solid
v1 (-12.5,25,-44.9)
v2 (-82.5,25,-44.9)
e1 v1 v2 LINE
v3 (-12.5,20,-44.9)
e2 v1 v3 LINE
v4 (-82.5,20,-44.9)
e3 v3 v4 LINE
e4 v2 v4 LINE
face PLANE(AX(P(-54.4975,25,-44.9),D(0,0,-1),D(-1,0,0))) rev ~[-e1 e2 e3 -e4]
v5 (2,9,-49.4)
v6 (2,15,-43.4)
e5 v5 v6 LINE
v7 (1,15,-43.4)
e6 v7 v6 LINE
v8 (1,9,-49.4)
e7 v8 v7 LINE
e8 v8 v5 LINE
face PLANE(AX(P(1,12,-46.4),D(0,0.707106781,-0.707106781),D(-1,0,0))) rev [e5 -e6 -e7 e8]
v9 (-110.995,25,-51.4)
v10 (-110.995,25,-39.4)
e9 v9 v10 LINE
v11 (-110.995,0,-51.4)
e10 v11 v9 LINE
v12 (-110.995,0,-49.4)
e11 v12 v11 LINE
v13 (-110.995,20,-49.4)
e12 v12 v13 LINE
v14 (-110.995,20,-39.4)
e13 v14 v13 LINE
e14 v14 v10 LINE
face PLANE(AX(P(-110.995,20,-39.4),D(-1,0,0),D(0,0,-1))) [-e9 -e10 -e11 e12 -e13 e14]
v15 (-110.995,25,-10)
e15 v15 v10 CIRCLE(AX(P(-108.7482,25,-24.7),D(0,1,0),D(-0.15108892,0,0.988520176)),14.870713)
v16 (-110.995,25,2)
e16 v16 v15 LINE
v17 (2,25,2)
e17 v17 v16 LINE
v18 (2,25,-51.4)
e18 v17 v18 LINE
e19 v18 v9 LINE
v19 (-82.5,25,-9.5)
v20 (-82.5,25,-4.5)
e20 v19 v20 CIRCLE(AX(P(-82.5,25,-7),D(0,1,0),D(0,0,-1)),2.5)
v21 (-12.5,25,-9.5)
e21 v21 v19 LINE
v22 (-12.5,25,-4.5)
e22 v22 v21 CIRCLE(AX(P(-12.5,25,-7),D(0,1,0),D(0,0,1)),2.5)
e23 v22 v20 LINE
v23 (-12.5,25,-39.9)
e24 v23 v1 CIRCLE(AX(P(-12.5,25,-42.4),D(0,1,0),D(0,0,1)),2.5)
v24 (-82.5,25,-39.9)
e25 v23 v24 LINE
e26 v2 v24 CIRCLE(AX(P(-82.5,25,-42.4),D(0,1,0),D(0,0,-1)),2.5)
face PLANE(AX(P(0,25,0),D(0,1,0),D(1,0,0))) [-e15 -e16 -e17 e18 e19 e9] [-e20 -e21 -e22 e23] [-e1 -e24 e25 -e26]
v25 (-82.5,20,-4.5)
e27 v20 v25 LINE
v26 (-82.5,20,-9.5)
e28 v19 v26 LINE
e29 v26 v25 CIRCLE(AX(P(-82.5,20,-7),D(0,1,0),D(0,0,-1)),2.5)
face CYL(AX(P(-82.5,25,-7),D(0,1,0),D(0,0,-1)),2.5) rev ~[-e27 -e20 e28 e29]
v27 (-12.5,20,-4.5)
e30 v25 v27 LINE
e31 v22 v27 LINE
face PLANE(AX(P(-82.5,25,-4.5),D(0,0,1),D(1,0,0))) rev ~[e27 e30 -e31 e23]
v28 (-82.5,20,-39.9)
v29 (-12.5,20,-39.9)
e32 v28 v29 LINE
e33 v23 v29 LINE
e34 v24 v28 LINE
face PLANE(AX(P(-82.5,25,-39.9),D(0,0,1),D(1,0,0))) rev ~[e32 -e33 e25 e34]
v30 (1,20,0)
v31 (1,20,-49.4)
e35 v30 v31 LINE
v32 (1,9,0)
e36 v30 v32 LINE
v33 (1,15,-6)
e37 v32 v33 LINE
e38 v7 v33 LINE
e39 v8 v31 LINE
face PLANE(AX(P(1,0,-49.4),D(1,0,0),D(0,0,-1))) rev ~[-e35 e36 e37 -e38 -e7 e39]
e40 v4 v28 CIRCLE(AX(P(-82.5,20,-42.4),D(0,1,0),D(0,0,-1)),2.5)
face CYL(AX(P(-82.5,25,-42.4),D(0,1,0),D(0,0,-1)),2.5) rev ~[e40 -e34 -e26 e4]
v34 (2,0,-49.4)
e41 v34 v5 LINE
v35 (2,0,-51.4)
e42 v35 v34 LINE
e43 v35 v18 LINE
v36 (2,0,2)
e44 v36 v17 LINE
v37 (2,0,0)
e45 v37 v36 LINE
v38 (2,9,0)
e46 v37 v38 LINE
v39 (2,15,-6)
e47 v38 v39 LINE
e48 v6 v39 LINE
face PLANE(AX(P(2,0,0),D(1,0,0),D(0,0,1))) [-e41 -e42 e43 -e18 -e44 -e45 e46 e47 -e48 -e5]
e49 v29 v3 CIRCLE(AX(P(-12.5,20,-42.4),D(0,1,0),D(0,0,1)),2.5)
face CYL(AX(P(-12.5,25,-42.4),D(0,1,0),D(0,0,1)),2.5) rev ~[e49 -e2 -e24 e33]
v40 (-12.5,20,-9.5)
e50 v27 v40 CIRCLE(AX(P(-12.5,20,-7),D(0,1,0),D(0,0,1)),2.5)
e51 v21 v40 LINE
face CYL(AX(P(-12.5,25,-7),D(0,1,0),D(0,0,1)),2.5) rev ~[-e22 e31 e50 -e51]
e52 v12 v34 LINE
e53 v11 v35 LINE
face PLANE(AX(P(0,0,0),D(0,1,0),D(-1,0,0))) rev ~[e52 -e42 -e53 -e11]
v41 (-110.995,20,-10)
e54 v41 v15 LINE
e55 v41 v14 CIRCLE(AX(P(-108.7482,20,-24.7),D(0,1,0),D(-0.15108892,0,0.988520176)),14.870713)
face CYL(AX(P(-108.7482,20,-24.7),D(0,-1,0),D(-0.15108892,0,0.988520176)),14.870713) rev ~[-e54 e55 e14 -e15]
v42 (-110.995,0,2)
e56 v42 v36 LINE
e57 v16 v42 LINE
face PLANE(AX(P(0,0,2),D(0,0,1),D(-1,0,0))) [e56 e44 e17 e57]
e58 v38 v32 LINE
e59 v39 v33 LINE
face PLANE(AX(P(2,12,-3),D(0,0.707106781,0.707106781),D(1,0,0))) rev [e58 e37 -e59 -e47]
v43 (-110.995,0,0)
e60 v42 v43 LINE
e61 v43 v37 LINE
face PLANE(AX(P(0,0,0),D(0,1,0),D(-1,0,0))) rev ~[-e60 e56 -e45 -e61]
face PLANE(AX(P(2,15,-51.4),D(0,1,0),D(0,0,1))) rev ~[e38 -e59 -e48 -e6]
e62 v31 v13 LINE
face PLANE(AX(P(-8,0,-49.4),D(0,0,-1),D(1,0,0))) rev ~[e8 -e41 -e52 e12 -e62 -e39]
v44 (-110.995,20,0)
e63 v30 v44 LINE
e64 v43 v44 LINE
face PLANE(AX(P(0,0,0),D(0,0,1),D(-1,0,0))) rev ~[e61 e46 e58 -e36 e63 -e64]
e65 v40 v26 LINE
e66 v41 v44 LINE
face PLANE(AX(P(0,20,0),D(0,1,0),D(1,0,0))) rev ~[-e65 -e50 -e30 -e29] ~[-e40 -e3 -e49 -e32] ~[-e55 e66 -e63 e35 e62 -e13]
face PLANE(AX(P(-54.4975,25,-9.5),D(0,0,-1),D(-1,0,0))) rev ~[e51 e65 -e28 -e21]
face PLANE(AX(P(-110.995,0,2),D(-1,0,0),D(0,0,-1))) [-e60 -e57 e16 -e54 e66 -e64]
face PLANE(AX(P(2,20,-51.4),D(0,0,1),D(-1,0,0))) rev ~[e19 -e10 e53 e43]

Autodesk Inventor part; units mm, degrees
ref_plane "YZ Plane" through (0, 0, 0) normal (1, 0, 0) x (0, 1, 0)
ref_plane "XZ Plane" through (0, 0, 0) normal (0, 1, 0) x (-1, 0, 0)
ref_plane "XY Plane" through (0, 0, 0) normal (0, 0, 1) x (1, 0, 0)
sketch "Szkic1" plane through (0, 0, 0) normal (0, 1, 0) x (-1, 0, 0)
  line L0 (0, 0) -> (0, -49.4)
  line L1 (0, 0) -> (108, 0)
  line L2 (0, 0) -> (108.995, 0)
  line L3 (108.995, 0) -> (108.995, -49.4)
  line L4 (108.995, -49.4) -> (0, -49.4)
  line L5 (0, -49.4) -> (0, 0)
  line L6 (0, 0) -> (0, 2)
  line L7 (0, 2) -> (-2, 2)
  line L8 (108.995, -49.4) -> (110.995, -49.4)
  line L9 (110.995, -49.4) -> (110.995, -51.4)
  line L10 (110.995, -51.4) -> (-2, -51.4)
  line L11 (-2, -51.4) -> (-2, 2)
  line L12 (-2, 2) -> (110.995, 2)
  line L13 (110.995, 2) -> (110.995, -51.4)
  line L14 (110.995, 2) -> (100.995, 2)
  line L15 (100.995, 2) -> (100.995, 0)
  line L16 (110.995, -51.4) -> (100.995, -51.4)
  line L17 (100.995, -51.4) -> (100.995, -49.4)
  line L18 (-2, 2) -> (8, 2)
  line L19 (8, 2) -> (8, 0)
  line L20 (-2, -51.4) -> (8, -51.4)
  line L21 (8, -51.4) -> (8, -49.4)
  line L22 (-2, 0) -> (0, 0)
  line L23 (108.995, 0) -> (110.995, 0)
  line L24 (108.995, -49.4) -> (110.995, -49.4)
  line L25 (-2, -49.4) -> (0, -49.4)
  line L26 (100.995, 2) -> (90.995, 2)
  line L27 (90.995, 2) -> (90.995, 0)
  line L28 (100.995, -51.4) -> (90.995, -51.4)
  line L29 (90.995, -51.4) -> (90.995, -49.4)
  line L30 (110.995, -24.7) -> (-2, -24.7)
  line L31 (54.4975, -51.4) -> (54.4975, 2)
  line L32 (90.995, 2) -> (60.995, 2)
  line L33 (60.995, 2) -> (60.995, 0)
  line L34 (48, 2) -> (48, 0)
  line L35 (60.995, -51.4) -> (60.995, -49.4)
  line L36 (48, -51.4) -> (48, -49.4)
  point P0 (48, 0)
  dimension "d0" = 49.4
  dimension "d1" = 108
  dimension "d2" = 2
  dimension "d3" = 2
  dimension "d4" = 2
  dimension "d5" = 2
  dimension "d6" = 10
  dimension "d7" = 10
  dimension "d8" = 10
  dimension "d9" = 10
  dimension "d16" = 10
  dimension "d17" = 10
  dimension "d33" = 30
extrude "Wyciągnięcie proste1" add sketch "Szkic1" along normal blind 20 contours L6 L12 L19 L1 | L22 L11 L7 L6 | L19 L12 L34 L1 | L4 L21 L10 L11 L25 | L34 L12 L31 L1 | L4 L36 L10 L21 | L31 L10 L36 L4 | L4 L35 L10 L31 | L31 L12 L33 L1 | L2 L1 L15 L12 L13 L23 | L8 L9 L10 L17 L4 | L4 L29 L10 L35 | L33 L12 L27 L1 | L17 L10 L29 L4 | L27 L12 L15 L1
sketch "Szkic2" plane through (0, 20, 0) normal (0, 1, 0) x (1, 0, 0)
  line L0 (-8, -2) -> (2, -2) projected
  line L1 (2, 51.4) -> (-110.995, 51.4) projected
  line L2 (2, -2) -> (-110.995, -2)
  line L3 (-110.995, -2) -> (-110.995, 51.4)
  line L4 (-110.995, 51.4) -> (2, 51.4)
  line L5 (2, 51.4) -> (2, -2)
  line L6 (-110.995, 0) -> (-110.995, 10)
  line L7 (-110.995, 49.4) -> (2, 49.4) projected
  line L8 (-110.995, 49.4) -> (-110.995, 39.4)
  arc A0 (-110.995, 10) -> (-110.995, 39.4) centre (-125.3914, 24.7) ccw
  arc A1 (-110.995, 10) -> (-110.995, 39.4) centre (-108.7482, 24.7) ccw
  point P0 (0, 0)
  point P1 (-100.995, 51.4)
  point P2 (-100.995, 49.4)
  point P3 (-100.995, 51.4)
  point P4 (-90.995, 51.4)
  point P5 (-90.995, 49.4)
  point P6 (-60.995, 51.4)
  point P7 (-60.995, 49.4)
  dimension "d12" = 10
  dimension "d13" = 10
extrude "Wyciągnięcie proste2" add sketch "Szkic2" along normal blind 5 contours L2 L3 A1 L7 L5 L0 | L7 L3 L1 L5
sketch "Szkic3" plane through (2, 0, -49.4) normal (1, 0, 0) x (0, 0, -1)
  line L0 (-39.4, 25) -> (-51.4, 25) projected
  line L1 (2, 0) -> (2, 20) projected
  line L2 (-51.4, 25) -> (2, 25)
  line L3 (2, 25) -> (2, 15)
  line L4 (2, 15) -> (-51.4, 15)
  line L5 (-51.4, 15) -> (-51.4, 25)
  point P0 (-49.4, 0)
  dimension "d18" = 10
extrude "Wyciągnięcie proste3" add sketch "Szkic3" against normal blind 1
chamfer "Faza1" distance 6 angle 45 2 edges at (1.5, 15, 0) (1.5, 15, -49.4)
sketch "Szkic5" plane through (0, 25, 0) normal (0, 1, 0) x (1, 0, 0)
  line L0 (-110.995, -2) -> (2, -2) projected
  line L1 (2, -2) -> (2, 7)
  line L2 (2, -2) -> (11, -2) construction
  line L3 (2, 7) -> (-12.5, 7)
  line L4 (-54.4975, -2) -> (-54.4975, 51.4)
  line L5 (2, 51.4) -> (-110.995, 51.4) projected
  line L6 (2, -2) -> (2, 51.4) projected
  line L7 (2, 24.7) -> (-94.0806, 24.7)
  line L8 (-110.995, 7) -> (-96.495, 7)
  line L9 (2, 42.4) -> (-12.5, 42.4)
  line L10 (-110.995, 42.4) -> (-96.495, 42.4)
  line L11 (-12.5, 7) -> (-82.5, 7) construction
  line L12 (-12.5, 9.5) -> (-82.5, 9.5)
  line L13 (-82.5, 4.5) -> (-12.5, 4.5)
  arc A0 (-12.5, 4.5) -> (-12.5, 9.5) centre (-12.5, 7) ccw
  arc A1 (-82.5, 9.5) -> (-82.5, 4.5) centre (-82.5, 7) ccw
  line L14 (-12.5, 42.4) -> (-82.5, 42.4) construction
  line L15 (-12.5, 44.9) -> (-82.5, 44.9)
  line L16 (-82.5, 39.9) -> (-12.5, 39.9)
  arc A2 (-12.5, 39.9) -> (-12.5, 44.9) centre (-12.5, 42.4) ccw
  arc A3 (-82.5, 44.9) -> (-82.5, 39.9) centre (-82.5, 42.4) ccw
  line L17 (-12.5, 42.4) -> (57.5, 42.4) construction
  point P0 (0, 0)
  point P1 (-47.5, 7)
  point P2 (-47.5, 42.4)
  dimension "d37" = 9
  dimension "d38" = 90
  dimension "d39" = 14.5
  dimension "d40" = 70
  dimension "d41" = 5
  dimension "d42" = 70
  dimension "d43" = 180
  dimension "d44" = 5
extrude "Wyciągnięcie proste5" cut sketch "Szkic5" against normal blind 20 contours L13 A1 L12 L4 | L4 L12 A0 L13 | L16 A3 L15 L4 | L4 L15 A2 L16
properties part number "klapa"
